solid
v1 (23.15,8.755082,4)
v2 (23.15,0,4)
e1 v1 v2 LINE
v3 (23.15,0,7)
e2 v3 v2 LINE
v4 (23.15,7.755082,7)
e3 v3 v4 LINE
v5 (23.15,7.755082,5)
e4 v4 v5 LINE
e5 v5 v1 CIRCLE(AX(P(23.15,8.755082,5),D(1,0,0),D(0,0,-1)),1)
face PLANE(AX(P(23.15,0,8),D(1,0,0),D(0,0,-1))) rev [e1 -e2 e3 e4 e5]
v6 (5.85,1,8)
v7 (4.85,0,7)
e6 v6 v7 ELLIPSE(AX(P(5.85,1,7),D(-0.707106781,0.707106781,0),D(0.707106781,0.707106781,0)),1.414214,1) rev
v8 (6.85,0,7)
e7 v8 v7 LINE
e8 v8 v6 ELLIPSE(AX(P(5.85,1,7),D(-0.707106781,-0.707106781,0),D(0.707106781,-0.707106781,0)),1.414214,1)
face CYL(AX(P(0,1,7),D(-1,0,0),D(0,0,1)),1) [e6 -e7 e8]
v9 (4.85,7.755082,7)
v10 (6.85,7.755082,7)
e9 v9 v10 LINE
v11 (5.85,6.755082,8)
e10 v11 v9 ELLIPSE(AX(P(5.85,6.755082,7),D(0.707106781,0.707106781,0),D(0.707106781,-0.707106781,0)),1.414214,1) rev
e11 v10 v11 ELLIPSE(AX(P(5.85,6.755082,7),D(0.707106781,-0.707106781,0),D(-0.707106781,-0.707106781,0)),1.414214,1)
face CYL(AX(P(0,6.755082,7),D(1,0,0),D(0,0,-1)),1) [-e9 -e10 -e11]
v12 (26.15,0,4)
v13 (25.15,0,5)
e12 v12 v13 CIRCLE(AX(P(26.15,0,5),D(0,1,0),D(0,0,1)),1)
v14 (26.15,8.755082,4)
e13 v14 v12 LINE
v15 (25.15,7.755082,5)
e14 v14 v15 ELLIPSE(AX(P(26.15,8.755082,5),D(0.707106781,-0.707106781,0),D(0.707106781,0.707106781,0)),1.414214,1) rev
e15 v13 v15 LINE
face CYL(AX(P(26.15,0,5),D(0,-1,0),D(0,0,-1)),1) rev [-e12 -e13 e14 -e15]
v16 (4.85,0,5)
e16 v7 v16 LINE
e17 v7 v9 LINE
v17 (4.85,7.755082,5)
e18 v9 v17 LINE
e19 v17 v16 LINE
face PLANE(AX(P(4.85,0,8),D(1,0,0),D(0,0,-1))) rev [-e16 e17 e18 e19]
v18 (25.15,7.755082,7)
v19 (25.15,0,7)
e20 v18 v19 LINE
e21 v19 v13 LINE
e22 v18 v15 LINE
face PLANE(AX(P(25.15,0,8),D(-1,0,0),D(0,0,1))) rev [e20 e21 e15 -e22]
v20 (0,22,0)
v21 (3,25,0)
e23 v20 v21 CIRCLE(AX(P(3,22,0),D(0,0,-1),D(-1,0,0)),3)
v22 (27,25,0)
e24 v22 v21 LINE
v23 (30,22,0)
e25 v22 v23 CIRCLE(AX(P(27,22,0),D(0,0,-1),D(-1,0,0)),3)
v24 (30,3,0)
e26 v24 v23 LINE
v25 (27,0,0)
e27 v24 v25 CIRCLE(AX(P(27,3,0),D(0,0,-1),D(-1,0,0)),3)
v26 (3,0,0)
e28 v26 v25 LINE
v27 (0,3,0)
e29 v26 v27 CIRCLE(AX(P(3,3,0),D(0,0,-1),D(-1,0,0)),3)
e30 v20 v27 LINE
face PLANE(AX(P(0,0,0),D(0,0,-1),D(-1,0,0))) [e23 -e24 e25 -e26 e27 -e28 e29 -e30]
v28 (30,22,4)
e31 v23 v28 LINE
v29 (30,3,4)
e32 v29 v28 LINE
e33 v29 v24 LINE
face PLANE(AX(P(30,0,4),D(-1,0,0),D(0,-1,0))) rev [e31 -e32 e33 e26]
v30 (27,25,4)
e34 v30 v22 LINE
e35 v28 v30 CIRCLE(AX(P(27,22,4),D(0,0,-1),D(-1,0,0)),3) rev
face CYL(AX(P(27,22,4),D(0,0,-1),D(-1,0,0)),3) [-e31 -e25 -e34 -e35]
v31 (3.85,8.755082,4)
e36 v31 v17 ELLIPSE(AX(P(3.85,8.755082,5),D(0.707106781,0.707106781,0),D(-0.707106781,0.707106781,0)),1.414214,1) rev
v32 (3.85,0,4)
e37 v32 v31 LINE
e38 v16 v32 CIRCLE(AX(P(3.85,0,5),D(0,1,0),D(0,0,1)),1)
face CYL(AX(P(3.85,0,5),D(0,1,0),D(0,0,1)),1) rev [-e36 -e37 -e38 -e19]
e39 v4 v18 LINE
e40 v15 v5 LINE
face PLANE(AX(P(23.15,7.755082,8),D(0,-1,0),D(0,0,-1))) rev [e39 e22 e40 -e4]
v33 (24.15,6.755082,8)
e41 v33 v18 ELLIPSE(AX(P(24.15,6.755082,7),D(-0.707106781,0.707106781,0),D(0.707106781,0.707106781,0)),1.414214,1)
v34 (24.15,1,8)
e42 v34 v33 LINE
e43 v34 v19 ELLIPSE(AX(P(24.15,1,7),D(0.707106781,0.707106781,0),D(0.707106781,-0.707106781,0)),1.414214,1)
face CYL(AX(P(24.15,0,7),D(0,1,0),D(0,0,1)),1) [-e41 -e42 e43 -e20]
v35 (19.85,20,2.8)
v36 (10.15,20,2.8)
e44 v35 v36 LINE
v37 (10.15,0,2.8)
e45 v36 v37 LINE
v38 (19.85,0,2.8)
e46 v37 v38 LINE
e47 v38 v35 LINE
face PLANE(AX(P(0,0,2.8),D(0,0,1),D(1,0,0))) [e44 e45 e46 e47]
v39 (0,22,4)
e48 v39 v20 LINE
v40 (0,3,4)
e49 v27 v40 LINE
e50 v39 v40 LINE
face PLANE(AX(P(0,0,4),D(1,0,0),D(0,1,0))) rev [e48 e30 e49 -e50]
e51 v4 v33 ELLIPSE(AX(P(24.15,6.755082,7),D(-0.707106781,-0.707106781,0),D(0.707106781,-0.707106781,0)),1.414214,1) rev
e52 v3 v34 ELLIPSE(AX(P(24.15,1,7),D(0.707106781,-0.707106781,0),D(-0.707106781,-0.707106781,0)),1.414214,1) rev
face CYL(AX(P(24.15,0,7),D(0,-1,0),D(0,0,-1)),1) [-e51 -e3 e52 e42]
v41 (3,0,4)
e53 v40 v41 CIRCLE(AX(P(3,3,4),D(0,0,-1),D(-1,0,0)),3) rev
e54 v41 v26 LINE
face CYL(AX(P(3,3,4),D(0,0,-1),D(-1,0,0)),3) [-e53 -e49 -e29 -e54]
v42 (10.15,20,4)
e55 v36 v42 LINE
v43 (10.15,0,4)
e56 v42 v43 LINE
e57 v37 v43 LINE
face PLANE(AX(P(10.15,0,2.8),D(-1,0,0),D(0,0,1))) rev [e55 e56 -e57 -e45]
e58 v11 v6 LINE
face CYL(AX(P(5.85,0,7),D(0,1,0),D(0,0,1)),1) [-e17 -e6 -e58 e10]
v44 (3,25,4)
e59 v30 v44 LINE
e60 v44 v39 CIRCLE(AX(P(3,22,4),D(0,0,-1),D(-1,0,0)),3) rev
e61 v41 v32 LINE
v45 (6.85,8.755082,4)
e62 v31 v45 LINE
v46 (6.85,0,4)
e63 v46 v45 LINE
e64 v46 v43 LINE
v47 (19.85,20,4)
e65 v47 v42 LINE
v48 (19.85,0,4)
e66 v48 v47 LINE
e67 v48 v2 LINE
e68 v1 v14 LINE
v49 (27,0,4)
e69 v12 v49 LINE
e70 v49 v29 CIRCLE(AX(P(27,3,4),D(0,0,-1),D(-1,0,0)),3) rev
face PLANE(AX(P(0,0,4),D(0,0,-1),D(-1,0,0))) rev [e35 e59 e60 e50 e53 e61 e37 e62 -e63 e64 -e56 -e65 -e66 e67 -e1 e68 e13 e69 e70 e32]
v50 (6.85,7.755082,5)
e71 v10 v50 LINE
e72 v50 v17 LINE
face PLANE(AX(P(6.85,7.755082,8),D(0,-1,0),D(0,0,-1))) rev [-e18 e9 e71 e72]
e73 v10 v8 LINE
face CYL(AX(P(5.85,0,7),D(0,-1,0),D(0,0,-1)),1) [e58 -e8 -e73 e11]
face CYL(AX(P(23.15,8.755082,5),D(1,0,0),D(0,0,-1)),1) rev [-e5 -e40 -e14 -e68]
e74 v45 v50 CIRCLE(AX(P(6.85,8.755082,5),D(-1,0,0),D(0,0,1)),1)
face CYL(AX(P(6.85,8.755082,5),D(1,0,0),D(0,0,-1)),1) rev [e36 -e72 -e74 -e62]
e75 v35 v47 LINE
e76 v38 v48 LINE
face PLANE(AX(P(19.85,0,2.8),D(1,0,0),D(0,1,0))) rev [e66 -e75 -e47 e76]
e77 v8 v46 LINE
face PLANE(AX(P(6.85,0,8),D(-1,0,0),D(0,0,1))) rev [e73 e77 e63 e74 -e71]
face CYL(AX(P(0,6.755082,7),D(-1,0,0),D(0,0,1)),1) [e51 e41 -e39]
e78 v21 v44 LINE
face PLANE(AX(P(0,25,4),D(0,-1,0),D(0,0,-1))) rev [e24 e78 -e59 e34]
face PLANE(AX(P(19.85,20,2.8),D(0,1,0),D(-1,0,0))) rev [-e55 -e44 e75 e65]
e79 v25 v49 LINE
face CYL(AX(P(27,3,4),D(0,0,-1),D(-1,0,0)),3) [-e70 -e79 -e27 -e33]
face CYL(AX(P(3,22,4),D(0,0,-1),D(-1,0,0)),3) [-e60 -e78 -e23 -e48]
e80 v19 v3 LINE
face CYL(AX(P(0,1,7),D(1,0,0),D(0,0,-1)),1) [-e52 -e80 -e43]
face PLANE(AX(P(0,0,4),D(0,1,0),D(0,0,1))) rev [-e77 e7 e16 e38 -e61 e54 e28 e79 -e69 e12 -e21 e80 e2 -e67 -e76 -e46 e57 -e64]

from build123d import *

# Parameters (mm, degrees)
SKETCH1_W           = 30
SKETCH1_H           = 25
BOSS_EXTRUDE1_DEPTH = 4
SKETCH3_W           = 9.7
SKETCH3_H           = 20
CUT_EXTRUDE1_DEPTH  = 1.2
FILLET1_R           = 3
SKETCH4_W           = 2
SKETCH4_H           = 7.755081554
BOSS_EXTRUDE2_DEPTH = 4
FILLET2_R           = 1


with BuildPart() as part:
    # Sketch1 → Boss-Extrude1 (new body)
    with BuildSketch(Plane.XY):
        with Locations((15, 12.5)):
            Rectangle(SKETCH1_W, SKETCH1_H)
    extrude(amount=BOSS_EXTRUDE1_DEPTH)

    # Sketch3 → Cut-Extrude1 (cut)
    with BuildSketch(Plane.XY.offset(4)):
        with Locations((15, 10)):
            Rectangle(SKETCH3_W, SKETCH3_H)
    extrude(amount=-CUT_EXTRUDE1_DEPTH, mode=Mode.SUBTRACT)

    # Fillet1
    fillet1_edges = [part.edges().sort_by_distance(p)[0] for p in [
        (0, 25, 2),
        (30, 25, 2),
        (30, 0, 2),
        (0, 0, 2),
    ]]
    fillet(fillet1_edges, radius=FILLET1_R)

    # Sketch4 → Boss-Extrude2 (add)
    with BuildSketch(Plane.XY.offset(4)):
        with Locations((24.15, 3.877540777)):
            Rectangle(SKETCH4_W, SKETCH4_H)
        with Locations((5.85, 3.877540777)):
            Rectangle(SKETCH4_W, SKETCH4_H)
    extrude(amount=BOSS_EXTRUDE2_DEPTH)

    # Fillet2
    fillet2_edges = [part.edges().sort_by_distance(p)[0] for p in [
        (25.15, 3.877540777, 4),
        (24.15, 7.755081554, 4),
        (23.15, 3.877540777, 8),
        (24.15, 0, 8),
        (25.15, 3.877540777, 8),
        (24.15, 7.755081554, 8),
        (5.85, 7.755081554, 4),
        (4.85, 3.877540777, 4),
        (6.85, 3.877540777, 8),
        (5.85, 7.755081554, 8),
        (4.85, 3.877540777, 8),
        (5.85, 0, 8),
    ]]
    fillet(fillet2_edges, radius=FILLET2_R - 0.0001)  # a hair under: the kernel refuses the full size


solid = part.part
